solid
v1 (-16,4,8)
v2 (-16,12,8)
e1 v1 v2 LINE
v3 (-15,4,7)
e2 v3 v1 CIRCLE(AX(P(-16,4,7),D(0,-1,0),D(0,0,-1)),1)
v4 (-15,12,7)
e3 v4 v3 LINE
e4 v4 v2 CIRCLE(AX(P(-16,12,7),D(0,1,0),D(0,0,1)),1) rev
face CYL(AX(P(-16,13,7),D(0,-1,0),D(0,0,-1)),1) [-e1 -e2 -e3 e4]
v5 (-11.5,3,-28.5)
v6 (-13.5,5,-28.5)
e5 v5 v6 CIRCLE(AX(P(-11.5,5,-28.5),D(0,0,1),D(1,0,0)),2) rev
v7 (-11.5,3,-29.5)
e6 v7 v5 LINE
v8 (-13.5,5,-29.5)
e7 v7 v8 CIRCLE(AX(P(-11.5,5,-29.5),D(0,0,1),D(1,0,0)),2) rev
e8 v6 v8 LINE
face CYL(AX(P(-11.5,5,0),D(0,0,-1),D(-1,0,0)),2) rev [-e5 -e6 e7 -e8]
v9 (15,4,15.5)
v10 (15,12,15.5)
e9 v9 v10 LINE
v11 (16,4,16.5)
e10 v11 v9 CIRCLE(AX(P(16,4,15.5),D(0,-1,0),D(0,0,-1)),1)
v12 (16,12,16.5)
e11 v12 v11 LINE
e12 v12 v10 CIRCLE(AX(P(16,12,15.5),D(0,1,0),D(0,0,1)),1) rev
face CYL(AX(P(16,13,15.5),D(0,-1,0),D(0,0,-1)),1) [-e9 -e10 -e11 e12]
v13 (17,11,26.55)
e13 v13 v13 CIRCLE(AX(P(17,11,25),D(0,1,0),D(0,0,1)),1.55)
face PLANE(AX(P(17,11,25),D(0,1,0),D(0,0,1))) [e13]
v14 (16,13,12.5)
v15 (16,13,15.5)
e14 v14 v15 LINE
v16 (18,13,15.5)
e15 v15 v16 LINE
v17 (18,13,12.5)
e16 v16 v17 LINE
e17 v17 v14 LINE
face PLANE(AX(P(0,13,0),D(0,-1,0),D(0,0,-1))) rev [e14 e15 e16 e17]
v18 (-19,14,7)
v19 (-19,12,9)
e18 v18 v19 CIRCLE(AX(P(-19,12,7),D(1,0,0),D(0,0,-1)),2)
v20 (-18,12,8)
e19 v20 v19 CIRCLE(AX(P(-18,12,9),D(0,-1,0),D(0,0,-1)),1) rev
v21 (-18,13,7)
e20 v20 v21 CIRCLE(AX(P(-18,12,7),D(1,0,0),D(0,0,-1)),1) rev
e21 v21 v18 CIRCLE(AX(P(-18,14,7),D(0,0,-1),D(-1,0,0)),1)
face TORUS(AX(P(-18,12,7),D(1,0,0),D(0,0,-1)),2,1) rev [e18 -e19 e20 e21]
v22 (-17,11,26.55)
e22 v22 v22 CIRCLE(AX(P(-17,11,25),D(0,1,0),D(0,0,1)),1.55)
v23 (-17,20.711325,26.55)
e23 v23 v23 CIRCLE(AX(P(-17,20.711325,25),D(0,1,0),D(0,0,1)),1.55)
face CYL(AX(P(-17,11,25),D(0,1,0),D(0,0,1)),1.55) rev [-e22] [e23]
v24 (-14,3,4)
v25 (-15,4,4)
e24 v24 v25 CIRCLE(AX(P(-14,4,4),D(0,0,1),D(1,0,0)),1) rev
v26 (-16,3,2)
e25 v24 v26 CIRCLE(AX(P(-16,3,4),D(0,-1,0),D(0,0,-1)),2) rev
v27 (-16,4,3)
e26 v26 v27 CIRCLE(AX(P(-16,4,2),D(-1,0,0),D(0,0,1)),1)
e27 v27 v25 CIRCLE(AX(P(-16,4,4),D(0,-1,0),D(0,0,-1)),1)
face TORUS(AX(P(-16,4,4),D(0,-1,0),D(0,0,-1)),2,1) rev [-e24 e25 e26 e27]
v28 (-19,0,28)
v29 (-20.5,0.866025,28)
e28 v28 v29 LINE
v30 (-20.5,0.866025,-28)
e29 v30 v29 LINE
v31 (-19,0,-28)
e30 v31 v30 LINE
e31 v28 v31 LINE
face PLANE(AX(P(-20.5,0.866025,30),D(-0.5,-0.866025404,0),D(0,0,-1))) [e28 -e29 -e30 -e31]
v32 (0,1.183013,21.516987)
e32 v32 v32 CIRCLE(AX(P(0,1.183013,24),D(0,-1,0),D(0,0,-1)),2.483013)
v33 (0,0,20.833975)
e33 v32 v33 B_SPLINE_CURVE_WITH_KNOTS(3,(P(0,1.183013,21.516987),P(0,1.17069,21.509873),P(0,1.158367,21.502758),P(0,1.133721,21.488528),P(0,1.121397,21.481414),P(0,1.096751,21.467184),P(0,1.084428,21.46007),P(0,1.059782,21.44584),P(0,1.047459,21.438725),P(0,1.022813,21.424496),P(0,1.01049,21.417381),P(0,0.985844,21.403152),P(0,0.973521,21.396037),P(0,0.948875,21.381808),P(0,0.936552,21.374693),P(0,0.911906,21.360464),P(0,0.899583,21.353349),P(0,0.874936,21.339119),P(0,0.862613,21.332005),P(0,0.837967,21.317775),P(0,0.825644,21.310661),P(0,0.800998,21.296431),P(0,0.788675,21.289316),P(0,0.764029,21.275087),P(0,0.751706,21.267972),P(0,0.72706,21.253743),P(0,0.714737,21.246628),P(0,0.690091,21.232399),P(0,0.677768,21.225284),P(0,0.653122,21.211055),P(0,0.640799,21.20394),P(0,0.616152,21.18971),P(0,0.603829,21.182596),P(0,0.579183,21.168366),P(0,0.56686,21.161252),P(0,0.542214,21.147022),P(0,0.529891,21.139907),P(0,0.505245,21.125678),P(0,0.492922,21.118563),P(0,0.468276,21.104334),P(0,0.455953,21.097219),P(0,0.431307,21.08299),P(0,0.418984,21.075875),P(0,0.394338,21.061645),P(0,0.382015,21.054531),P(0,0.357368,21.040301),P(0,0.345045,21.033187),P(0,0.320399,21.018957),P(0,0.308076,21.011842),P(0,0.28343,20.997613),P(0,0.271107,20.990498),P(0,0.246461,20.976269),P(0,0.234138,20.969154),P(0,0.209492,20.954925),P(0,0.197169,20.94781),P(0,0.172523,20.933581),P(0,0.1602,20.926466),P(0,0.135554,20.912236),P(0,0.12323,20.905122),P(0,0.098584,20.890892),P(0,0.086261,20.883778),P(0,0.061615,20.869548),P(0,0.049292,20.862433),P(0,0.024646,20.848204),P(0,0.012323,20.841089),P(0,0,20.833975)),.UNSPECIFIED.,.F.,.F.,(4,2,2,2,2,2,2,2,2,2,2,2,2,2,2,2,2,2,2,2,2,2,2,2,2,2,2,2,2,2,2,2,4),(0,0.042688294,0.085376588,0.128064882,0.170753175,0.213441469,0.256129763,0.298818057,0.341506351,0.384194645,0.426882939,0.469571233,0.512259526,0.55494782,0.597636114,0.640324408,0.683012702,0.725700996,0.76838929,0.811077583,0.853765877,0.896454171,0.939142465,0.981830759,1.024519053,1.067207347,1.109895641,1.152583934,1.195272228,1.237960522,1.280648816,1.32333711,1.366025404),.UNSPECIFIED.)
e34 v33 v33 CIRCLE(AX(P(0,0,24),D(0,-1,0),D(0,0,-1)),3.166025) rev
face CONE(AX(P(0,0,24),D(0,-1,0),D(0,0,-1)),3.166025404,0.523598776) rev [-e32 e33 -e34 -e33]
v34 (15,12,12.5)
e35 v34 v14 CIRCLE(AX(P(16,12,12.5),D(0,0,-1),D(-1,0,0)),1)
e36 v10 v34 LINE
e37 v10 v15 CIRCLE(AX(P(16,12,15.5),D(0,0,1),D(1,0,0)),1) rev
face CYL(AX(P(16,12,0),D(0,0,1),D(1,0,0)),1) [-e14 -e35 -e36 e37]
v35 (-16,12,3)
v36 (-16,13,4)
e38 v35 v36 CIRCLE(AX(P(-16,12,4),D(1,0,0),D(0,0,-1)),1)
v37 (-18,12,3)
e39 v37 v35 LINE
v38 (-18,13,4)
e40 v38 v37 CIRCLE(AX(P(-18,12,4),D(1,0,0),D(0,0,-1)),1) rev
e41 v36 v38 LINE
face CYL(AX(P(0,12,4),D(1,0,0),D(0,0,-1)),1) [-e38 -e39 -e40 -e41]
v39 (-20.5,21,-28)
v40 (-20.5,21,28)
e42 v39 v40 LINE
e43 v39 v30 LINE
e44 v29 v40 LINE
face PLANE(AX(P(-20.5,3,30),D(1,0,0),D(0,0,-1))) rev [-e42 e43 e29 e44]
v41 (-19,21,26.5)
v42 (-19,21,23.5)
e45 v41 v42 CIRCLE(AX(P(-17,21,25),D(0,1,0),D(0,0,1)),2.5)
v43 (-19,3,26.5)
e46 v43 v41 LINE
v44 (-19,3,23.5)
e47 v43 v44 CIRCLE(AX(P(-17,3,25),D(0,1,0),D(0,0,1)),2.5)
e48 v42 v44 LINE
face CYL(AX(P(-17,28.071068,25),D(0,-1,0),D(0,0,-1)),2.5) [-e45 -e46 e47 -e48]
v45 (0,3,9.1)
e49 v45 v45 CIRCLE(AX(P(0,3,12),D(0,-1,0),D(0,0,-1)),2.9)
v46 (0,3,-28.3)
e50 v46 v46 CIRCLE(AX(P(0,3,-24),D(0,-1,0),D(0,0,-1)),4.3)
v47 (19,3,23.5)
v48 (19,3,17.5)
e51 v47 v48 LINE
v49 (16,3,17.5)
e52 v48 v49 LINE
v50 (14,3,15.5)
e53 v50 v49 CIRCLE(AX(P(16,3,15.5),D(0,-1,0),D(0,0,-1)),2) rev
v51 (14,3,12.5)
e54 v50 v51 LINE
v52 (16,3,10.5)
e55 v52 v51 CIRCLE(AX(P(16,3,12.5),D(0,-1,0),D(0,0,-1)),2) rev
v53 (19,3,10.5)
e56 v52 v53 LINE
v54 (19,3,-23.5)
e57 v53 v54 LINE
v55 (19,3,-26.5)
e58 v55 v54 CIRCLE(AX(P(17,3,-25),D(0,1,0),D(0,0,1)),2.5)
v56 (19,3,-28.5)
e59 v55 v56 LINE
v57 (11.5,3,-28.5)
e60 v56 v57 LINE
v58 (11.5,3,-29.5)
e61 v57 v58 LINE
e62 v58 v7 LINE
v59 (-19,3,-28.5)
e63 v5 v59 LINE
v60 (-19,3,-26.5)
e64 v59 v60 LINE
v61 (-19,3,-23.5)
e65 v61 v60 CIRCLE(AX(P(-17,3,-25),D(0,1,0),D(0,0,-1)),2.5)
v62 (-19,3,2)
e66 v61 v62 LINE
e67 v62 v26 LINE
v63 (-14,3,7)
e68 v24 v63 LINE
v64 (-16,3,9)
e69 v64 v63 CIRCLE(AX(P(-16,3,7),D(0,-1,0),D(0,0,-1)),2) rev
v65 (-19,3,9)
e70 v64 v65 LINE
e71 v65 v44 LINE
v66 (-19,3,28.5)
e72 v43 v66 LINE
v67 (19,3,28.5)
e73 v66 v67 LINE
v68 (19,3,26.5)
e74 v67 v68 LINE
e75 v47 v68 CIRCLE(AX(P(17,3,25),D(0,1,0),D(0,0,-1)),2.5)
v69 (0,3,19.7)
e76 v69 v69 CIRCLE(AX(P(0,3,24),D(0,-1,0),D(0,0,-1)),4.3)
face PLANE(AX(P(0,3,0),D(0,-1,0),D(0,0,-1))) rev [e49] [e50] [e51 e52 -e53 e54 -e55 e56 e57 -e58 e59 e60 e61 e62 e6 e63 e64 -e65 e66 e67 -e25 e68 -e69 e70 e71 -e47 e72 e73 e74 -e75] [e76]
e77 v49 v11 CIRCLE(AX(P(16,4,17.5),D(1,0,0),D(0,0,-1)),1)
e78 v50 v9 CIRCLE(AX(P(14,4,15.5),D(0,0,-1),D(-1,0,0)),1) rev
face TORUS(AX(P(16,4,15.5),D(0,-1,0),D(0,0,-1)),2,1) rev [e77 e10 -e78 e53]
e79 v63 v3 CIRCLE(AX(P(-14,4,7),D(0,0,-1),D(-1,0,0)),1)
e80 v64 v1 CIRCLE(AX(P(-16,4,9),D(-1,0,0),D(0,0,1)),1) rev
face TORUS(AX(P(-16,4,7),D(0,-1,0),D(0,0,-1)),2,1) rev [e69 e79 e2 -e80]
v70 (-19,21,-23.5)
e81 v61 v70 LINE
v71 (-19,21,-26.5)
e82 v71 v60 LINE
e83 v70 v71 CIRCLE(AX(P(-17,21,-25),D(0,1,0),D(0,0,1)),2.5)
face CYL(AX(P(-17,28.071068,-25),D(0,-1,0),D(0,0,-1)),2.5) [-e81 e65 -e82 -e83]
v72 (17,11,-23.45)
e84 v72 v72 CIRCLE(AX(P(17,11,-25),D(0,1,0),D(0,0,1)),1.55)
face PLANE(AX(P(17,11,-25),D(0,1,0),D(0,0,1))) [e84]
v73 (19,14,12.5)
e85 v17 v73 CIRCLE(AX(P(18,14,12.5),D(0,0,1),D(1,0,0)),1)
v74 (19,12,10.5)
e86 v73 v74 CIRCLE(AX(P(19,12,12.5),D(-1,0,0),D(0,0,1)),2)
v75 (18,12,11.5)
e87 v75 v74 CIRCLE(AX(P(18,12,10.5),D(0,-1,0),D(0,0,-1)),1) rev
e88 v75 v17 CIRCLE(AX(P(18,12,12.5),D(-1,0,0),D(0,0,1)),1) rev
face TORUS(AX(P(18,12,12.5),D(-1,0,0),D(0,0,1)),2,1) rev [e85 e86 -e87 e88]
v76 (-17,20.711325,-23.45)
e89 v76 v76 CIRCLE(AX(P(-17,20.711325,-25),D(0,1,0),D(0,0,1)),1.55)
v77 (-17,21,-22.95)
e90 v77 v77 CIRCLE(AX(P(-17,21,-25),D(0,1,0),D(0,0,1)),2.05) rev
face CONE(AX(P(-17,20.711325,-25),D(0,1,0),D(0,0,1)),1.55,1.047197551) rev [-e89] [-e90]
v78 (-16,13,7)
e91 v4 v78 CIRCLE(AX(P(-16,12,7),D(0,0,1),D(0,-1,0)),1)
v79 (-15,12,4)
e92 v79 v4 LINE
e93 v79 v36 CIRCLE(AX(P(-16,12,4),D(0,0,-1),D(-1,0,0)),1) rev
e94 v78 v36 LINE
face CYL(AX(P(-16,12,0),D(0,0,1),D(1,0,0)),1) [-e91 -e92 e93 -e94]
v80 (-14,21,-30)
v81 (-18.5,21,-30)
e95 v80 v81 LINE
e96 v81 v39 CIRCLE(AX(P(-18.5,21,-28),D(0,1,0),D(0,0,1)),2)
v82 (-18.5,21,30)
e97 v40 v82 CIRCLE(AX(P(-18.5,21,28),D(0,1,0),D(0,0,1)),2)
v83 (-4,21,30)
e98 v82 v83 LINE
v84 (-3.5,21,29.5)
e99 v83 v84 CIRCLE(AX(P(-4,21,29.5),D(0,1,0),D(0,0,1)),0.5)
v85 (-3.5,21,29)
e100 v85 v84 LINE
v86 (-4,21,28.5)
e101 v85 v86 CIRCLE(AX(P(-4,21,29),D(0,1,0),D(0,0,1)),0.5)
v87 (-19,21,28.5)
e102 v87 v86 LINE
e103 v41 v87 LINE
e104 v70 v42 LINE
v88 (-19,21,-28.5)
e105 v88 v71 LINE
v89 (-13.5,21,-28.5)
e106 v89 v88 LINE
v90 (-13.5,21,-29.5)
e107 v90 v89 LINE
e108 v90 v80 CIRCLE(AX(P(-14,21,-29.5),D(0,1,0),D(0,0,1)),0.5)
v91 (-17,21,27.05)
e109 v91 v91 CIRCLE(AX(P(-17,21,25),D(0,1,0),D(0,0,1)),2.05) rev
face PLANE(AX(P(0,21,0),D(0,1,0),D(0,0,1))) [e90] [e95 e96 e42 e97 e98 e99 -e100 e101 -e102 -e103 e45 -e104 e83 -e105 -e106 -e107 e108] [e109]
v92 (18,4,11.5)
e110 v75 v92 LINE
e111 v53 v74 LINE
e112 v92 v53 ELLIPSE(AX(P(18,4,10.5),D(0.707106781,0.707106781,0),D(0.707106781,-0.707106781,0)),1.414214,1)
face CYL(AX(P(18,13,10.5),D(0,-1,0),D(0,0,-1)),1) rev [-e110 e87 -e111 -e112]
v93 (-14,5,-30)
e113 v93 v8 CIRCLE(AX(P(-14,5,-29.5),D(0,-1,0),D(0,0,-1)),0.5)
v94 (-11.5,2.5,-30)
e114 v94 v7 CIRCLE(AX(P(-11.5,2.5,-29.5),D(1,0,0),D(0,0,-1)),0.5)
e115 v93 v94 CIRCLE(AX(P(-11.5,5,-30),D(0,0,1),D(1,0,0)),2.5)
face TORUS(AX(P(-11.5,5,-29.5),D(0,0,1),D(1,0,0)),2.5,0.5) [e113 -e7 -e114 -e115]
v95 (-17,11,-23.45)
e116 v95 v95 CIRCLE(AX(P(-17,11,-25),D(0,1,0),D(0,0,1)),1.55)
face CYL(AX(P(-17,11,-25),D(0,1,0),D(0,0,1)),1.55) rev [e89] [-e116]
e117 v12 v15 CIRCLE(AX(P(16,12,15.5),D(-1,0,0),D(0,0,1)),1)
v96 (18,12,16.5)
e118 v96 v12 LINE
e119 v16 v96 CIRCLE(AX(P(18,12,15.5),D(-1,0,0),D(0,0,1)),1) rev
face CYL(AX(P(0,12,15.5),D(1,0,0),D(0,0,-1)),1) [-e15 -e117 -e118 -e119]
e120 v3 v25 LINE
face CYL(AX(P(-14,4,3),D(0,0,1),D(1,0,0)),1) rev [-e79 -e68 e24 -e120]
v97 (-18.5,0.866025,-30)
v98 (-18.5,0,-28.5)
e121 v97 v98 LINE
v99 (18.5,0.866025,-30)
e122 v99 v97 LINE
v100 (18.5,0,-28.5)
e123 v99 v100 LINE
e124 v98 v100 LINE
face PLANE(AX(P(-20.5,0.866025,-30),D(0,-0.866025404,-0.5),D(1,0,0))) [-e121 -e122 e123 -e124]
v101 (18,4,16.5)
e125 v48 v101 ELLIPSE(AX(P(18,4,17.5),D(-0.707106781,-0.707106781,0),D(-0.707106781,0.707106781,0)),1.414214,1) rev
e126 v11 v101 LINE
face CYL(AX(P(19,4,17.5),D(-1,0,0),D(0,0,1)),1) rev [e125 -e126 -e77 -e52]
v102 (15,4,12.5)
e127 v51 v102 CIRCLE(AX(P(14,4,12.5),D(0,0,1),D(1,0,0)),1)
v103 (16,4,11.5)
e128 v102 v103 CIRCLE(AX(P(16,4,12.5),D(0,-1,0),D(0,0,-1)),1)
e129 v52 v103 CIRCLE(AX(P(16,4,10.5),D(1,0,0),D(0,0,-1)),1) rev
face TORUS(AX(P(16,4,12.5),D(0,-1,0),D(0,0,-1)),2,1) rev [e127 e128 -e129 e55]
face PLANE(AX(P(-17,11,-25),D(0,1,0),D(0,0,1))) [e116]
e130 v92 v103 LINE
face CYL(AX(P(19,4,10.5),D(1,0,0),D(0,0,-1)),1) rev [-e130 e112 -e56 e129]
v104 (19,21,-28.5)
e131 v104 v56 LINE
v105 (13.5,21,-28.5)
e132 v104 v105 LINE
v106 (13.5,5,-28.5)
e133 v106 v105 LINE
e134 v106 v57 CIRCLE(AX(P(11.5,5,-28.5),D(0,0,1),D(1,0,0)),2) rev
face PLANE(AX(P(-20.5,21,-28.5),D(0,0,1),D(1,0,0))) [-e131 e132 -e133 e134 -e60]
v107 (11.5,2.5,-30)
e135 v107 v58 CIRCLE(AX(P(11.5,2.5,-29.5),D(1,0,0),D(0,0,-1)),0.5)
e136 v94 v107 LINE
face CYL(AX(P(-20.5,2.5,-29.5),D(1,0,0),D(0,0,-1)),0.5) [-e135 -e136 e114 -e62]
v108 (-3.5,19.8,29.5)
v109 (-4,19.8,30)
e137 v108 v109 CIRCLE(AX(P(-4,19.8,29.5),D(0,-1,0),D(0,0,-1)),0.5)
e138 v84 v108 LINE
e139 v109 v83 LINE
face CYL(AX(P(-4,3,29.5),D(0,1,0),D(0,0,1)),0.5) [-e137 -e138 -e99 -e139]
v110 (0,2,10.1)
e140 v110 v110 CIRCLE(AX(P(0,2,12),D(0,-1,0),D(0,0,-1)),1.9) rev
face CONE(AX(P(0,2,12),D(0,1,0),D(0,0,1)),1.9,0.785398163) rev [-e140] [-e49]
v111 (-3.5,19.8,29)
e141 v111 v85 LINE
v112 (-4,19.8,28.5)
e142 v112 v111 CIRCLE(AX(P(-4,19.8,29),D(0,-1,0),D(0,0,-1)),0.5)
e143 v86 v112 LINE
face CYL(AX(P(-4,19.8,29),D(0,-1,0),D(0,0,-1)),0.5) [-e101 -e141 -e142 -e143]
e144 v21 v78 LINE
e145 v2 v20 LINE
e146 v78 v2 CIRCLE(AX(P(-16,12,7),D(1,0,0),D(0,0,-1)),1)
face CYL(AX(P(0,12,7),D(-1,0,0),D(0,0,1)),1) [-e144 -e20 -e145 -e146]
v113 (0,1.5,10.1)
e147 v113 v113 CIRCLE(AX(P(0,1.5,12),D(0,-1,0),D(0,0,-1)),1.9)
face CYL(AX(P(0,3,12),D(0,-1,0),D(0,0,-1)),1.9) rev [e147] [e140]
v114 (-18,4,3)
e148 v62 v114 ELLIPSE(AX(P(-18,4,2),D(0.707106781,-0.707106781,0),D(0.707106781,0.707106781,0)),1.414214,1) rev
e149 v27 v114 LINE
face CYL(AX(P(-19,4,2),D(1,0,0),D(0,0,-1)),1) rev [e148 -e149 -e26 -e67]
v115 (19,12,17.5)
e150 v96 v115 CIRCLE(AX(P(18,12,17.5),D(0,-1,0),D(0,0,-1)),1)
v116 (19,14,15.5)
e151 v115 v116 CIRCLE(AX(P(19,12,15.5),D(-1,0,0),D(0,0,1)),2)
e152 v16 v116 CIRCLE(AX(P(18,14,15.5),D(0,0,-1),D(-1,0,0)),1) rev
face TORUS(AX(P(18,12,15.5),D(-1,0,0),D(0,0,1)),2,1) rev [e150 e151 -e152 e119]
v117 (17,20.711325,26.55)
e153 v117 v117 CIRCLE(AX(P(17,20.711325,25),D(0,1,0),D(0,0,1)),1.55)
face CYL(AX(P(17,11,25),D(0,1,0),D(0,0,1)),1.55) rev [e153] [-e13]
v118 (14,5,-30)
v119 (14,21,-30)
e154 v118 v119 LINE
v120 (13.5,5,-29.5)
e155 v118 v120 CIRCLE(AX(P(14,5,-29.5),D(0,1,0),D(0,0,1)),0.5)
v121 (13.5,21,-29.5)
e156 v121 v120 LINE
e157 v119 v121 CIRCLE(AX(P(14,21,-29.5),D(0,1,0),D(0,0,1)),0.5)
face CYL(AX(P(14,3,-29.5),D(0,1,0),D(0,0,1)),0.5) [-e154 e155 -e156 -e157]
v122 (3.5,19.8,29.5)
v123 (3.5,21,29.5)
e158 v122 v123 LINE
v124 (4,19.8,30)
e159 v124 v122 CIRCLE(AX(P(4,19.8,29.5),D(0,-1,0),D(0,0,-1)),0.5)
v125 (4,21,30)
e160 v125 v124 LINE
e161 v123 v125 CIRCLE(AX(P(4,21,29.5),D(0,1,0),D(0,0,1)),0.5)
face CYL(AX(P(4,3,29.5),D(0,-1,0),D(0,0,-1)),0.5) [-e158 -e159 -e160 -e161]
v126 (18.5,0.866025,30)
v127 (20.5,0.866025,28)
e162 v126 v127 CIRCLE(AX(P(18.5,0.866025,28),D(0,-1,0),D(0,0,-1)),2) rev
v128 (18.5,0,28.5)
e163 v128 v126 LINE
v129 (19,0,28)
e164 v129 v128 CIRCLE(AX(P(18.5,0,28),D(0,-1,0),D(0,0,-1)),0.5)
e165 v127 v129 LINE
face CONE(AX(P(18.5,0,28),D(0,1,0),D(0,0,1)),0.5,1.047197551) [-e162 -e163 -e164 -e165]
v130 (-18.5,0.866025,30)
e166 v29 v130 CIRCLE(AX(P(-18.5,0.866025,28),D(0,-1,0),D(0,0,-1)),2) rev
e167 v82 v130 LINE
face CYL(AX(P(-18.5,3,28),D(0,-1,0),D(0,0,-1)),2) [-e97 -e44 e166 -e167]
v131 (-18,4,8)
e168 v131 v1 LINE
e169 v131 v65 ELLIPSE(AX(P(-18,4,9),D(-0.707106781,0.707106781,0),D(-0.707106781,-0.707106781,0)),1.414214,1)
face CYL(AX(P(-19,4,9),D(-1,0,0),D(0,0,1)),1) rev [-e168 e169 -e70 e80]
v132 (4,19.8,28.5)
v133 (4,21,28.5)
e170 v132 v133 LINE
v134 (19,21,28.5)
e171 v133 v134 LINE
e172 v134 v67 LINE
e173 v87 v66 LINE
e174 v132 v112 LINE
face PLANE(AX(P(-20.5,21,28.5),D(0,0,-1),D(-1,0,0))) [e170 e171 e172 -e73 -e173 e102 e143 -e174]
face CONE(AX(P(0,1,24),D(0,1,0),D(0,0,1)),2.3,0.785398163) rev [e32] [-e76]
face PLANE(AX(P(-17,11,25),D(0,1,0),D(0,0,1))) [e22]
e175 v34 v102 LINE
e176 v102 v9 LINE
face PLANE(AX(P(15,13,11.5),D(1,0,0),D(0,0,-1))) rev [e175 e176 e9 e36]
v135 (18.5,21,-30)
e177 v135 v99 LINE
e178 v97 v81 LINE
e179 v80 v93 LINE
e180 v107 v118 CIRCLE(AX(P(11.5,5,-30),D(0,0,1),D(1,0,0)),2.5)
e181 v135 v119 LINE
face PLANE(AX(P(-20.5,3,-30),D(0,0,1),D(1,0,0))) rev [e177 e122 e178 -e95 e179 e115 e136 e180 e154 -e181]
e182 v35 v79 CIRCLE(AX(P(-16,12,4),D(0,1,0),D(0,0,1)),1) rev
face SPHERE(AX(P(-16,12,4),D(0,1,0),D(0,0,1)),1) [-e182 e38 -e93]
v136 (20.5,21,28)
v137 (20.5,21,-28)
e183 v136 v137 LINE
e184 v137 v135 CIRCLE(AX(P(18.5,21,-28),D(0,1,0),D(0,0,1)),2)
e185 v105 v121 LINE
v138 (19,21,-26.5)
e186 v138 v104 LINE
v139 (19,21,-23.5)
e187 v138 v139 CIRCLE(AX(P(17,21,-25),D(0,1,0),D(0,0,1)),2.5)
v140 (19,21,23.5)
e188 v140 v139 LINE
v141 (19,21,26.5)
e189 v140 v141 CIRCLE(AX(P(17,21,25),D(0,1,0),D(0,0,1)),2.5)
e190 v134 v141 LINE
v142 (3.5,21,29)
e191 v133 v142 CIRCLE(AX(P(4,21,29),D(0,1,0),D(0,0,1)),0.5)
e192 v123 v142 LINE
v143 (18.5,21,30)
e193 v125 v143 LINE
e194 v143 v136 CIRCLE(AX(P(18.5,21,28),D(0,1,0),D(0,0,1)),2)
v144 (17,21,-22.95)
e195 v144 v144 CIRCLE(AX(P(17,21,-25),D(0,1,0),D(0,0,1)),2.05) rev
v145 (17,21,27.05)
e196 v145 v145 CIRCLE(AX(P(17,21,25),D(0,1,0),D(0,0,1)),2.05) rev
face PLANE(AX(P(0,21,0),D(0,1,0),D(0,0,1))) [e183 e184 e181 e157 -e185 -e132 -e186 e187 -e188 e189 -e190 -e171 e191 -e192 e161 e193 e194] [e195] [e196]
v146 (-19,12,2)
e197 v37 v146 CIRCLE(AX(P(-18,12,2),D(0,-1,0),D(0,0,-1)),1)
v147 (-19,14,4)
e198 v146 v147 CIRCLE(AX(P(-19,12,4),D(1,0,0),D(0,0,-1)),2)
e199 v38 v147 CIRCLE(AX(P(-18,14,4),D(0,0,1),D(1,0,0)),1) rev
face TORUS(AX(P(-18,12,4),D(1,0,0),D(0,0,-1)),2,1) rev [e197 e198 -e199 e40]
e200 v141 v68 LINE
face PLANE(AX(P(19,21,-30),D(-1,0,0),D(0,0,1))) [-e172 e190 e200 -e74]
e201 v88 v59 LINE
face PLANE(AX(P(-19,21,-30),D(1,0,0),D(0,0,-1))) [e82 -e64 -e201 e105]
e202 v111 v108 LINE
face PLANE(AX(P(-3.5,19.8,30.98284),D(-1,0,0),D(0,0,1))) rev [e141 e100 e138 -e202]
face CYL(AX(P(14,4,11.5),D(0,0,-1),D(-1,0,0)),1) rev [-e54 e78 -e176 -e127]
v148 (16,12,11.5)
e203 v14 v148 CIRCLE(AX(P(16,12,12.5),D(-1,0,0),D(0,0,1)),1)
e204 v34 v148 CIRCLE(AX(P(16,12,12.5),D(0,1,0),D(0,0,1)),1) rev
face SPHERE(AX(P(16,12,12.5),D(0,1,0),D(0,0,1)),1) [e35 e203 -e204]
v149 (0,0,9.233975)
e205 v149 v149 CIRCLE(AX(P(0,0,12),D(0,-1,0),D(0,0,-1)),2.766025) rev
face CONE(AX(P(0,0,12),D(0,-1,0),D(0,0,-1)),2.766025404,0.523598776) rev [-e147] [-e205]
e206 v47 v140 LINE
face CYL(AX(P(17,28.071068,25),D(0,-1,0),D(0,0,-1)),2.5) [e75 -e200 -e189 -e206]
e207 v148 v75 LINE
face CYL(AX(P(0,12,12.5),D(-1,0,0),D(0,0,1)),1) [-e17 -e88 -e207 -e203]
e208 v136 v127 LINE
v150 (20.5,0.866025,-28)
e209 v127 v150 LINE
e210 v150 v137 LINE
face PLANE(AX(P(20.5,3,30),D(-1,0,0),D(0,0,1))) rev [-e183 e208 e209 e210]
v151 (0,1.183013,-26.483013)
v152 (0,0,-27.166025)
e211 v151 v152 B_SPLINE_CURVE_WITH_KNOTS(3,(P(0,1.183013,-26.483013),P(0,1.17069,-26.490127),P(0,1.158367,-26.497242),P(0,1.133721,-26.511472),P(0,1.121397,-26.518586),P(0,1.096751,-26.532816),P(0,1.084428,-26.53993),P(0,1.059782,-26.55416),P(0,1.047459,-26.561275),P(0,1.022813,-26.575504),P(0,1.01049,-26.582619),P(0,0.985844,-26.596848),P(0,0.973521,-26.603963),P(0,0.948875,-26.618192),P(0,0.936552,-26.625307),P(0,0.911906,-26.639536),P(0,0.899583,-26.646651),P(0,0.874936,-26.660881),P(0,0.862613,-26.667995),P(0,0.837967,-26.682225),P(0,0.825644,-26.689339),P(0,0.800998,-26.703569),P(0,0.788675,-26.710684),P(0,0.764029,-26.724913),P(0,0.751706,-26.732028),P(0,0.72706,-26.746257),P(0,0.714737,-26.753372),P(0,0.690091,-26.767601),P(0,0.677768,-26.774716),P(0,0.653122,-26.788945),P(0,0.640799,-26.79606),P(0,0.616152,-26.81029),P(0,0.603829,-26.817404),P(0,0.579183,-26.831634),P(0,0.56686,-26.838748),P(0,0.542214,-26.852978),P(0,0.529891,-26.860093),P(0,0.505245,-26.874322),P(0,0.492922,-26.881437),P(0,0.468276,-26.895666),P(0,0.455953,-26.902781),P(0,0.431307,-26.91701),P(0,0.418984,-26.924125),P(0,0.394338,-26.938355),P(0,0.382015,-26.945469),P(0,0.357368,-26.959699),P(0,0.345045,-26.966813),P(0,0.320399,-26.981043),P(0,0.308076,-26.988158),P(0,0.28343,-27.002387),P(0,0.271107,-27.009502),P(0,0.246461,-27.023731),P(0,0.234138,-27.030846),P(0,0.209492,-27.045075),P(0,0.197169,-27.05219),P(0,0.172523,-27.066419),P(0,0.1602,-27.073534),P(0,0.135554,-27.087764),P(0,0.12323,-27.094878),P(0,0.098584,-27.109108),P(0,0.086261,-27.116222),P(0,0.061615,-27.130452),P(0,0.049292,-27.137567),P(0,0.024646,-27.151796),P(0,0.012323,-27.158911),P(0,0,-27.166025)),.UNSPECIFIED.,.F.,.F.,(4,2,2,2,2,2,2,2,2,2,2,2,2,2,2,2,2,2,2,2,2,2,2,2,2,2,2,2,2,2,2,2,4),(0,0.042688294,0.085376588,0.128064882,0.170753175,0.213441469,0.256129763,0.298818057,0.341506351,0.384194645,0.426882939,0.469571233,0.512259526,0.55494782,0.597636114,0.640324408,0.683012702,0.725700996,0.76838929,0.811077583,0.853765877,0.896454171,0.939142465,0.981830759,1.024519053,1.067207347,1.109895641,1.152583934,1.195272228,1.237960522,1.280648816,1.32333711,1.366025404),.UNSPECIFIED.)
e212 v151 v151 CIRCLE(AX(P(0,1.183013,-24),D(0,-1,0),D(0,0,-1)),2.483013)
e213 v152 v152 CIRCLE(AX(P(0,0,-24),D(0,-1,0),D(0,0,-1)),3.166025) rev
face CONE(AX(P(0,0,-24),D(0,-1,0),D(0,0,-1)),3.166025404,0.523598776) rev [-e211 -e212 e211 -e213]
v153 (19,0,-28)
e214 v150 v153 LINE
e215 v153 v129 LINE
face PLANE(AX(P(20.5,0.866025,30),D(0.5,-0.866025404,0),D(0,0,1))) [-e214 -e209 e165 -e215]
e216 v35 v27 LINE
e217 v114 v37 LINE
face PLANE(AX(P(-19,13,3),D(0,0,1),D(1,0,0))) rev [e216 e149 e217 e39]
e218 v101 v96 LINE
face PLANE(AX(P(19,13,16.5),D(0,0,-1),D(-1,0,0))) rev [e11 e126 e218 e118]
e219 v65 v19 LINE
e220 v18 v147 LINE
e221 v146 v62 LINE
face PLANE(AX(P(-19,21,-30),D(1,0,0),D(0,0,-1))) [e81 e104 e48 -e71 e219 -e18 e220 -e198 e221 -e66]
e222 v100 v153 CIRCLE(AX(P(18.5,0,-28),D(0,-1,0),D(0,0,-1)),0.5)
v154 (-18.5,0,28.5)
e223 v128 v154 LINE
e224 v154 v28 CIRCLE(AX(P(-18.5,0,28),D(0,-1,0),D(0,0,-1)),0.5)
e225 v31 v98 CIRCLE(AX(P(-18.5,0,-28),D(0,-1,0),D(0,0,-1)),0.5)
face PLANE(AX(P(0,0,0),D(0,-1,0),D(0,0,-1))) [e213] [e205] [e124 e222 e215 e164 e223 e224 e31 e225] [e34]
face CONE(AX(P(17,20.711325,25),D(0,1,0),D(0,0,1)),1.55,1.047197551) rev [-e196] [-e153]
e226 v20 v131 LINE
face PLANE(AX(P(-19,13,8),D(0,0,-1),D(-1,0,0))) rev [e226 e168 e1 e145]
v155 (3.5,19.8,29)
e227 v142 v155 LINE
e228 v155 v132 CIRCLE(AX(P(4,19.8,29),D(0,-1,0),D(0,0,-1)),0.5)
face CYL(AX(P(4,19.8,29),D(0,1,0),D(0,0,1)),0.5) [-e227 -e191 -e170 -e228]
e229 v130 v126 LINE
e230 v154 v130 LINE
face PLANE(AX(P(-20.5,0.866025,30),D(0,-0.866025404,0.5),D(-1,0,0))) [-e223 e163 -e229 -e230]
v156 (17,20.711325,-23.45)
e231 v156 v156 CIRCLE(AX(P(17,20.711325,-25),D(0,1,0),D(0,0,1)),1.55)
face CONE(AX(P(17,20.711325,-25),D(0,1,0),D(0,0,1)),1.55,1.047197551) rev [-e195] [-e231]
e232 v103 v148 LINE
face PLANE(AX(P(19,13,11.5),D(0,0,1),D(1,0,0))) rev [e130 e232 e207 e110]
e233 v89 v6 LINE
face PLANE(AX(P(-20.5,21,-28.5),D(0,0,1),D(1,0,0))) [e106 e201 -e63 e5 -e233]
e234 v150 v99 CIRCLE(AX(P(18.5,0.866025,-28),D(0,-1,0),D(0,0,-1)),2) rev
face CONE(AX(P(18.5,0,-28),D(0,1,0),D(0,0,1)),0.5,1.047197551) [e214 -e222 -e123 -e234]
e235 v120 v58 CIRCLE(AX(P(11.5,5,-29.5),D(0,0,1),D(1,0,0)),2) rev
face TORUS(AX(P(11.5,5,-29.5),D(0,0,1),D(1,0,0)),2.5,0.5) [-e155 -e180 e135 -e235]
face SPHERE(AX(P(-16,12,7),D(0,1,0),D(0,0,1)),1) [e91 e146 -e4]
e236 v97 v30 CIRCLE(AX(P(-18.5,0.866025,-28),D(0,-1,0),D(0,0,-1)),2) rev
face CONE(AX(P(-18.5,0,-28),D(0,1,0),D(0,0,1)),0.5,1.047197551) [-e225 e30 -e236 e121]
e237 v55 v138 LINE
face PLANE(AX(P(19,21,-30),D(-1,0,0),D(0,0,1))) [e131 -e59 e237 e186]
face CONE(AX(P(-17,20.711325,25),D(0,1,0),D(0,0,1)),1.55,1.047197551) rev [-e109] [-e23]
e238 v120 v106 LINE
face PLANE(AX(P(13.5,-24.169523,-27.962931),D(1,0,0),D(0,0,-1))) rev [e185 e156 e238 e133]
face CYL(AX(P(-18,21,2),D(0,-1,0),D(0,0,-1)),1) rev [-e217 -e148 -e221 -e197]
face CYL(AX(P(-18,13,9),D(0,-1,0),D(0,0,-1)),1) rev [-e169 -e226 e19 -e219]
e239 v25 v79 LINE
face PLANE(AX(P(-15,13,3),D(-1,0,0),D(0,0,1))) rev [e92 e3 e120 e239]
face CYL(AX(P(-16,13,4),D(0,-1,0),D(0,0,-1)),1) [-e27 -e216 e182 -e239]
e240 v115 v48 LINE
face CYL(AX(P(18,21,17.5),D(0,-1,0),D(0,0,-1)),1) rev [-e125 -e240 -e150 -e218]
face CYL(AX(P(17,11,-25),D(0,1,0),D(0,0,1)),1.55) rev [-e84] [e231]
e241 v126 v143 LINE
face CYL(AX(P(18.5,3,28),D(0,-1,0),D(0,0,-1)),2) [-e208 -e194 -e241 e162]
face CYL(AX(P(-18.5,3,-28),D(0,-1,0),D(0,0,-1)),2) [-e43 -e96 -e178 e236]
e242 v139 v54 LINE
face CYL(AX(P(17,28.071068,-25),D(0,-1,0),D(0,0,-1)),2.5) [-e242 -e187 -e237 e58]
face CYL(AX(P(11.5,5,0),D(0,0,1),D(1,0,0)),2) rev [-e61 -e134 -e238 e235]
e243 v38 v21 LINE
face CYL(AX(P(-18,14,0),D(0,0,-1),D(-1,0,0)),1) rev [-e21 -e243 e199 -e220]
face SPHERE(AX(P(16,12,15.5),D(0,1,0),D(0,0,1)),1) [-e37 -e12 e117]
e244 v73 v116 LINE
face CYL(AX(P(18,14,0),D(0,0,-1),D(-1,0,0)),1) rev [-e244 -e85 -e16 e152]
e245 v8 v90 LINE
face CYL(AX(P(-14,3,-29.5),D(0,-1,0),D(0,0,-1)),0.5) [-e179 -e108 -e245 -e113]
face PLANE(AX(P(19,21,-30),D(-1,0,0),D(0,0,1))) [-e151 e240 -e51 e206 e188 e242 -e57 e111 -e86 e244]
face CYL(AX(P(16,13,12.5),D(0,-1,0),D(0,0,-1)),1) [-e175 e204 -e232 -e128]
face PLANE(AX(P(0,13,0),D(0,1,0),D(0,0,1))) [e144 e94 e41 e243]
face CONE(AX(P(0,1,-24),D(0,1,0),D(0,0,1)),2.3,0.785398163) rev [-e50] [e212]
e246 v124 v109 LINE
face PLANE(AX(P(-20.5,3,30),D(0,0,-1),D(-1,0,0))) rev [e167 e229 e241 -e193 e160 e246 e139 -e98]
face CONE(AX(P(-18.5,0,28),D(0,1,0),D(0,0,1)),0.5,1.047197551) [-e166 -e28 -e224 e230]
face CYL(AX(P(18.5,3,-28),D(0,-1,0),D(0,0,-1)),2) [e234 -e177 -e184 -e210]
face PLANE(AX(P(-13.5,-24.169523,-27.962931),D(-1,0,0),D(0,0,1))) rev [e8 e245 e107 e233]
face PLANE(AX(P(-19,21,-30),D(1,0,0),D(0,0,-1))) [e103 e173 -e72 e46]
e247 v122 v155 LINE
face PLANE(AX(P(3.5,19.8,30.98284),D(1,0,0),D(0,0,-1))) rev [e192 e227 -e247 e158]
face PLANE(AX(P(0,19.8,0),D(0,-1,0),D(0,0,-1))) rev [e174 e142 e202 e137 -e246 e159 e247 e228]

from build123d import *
from OCP.BRepFilletAPI import BRepFilletAPI_MakeChamfer

# Parameters (mm, degrees)
SKETCH_1_W          = 41
SKETCH_1_H          = 60
SKETCH_1_R          = 2.3
SKETCH_1_R_2        = 1.9
EXTRUDE_1_DEPTH     = 3
CHAMFER_1_SIZE      = 2
SKETCH_2_W          = 41
SKETCH_2_H          = 60
SKETCH_2_W_2        = 38
SKETCH_2_H_2        = 57
EXTRUDE_1_2_DEPTH   = 18
SKETCH_3_W          = 27
SKETCH_3_H          = 3.030341357
CUT_EXTRUDE_1_DEPTH = 18
SKETCH_4_R          = 2.5
EXTRUDE_2_DEPTH     = 18
SKETCH_5_R          = 1.55
CUT_EXTRUDE_2_DEPTH = 10
SKETCH_7_W          = 7
SKETCH_7_H          = 4.356080651
CUT_EXTRUDE_3_DEPTH = 1.2
FILLET_2_R          = 0.5
FILLET_3_R          = 2
CHAMFER_4_SIZE      = 0.866025404
CHAMFER_4_SIZE_2    = 1.5
CHAMFER_6_SIZE      = 0.5
CHAMFER_6_SIZE2     = 0.288675135
SKETCH_8_W          = 4
SKETCH_8_H          = 5
EXTRUDE_3_DEPTH     = 10
FILLET_6_R          = 1
FILLET_7_R          = 2
FILLET_8_R          = 0.5
CHAMFER_7_SIZE      = 1


with BuildPart() as part:
    # Эскиз1 → Extrude 1 (new body)
    with BuildSketch(Plane(origin=(0, 0, 0), x_dir=(1, 0, 0), z_dir=(0, 1, 0))):
        Rectangle(SKETCH_1_W, SKETCH_1_H)
        with Locations(Location((0, 24, 0), (0, 0, 270))):
            Circle(SKETCH_1_R, mode=Mode.SUBTRACT)
        with Locations(Location((0, -24, 0), (0, 0, 270))):
            Circle(SKETCH_1_R, mode=Mode.SUBTRACT)
        with Locations(Location((0, -12, 0), (0, 0, 270))):
            Circle(SKETCH_1_R_2, mode=Mode.SUBTRACT)
    extrude(amount=EXTRUDE_1_DEPTH)

    # Фаска1
    chamfer_1_edges = [part.edges().sort_by_distance(p)[0] for p in [
        (0, 3, -26.3),
        (0, 3, 21.7),
    ]]
    chamfer(chamfer_1_edges, length=CHAMFER_1_SIZE)

    # Эскиз2 → Extrude 1 2 (add)
    with BuildSketch(Plane(origin=(0, 3, 0), x_dir=(1, 0, 0), z_dir=(0, 1, 0))):
        Rectangle(SKETCH_2_W, SKETCH_2_H)
        Rectangle(SKETCH_2_W_2, SKETCH_2_H_2, mode=Mode.SUBTRACT)
    extrude(amount=EXTRUDE_1_2_DEPTH)

    # Эскиз3 → Вырез-Вытянуть1 (cut)
    with BuildSketch(Plane(origin=(0, 21, 0), x_dir=(1, 0, 0), z_dir=(0, 1, 0))):
        with Locations((0, 29.478101209)):
            Rectangle(SKETCH_3_W, SKETCH_3_H)
    extrude(amount=-CUT_EXTRUDE_1_DEPTH, mode=Mode.SUBTRACT)

    # Эскиз4 → Бобышка-Вытянуть2 (add)
    with BuildSketch(Plane(origin=(0, 3, 0), x_dir=(1, 0, 0), z_dir=(0, 1, 0))):
        with Locations((17, 25)):
            Circle(SKETCH_4_R)
        with Locations((-17, 25)):
            Circle(SKETCH_4_R)
        with Locations((17, -25)):
            Circle(SKETCH_4_R)
        with Locations((-17, -25)):
            Circle(SKETCH_4_R)
    extrude(amount=EXTRUDE_2_DEPTH)

    # Эскиз5 → Вырез-Вытянуть2 (cut)
    with BuildSketch(Plane(origin=(0, 21, 0), x_dir=(1, 0, 0), z_dir=(0, 1, 0))):
        with Locations(Location((17, 25, 0), (0, 0, 270))):
            Circle(SKETCH_5_R)
        with Locations(Location((17, -25, 0), (0, 0, 270))):
            Circle(SKETCH_5_R)
        with Locations(Location((-17, -25, 0), (0, 0, 270))):
            Circle(SKETCH_5_R)
        with Locations(Location((-17, 25, 0), (0, 0, 270))):
            Circle(SKETCH_5_R)
    extrude(amount=-CUT_EXTRUDE_2_DEPTH, mode=Mode.SUBTRACT)

    # Эскиз7 → Вырез-Вытянуть3 (cut)
    with BuildSketch(Plane(origin=(0, 21, 0), x_dir=(1, 0, 0), z_dir=(0, 1, 0))):
        with Locations((0, -28.804800006)):
            Rectangle(SKETCH_7_W, SKETCH_7_H)
    extrude(amount=-CUT_EXTRUDE_3_DEPTH, mode=Mode.SUBTRACT)

    # Скругление2
    fillet_2_edges = [part.edges().sort_by_distance(p)[0] for p in [
        (-3.5, 20.4, 28.5),
        (3.5, 20.4, 28.5),
        (3.5, 20.4, 30),
        (-3.5, 20.4, 30),
    ]]
    fillet(fillet_2_edges, radius=FILLET_2_R)

    # Скругление3
    fillet_3_edges = [part.edges().sort_by_distance(p)[0] for p in [
        (20.5, 10.5, 30),
        (-20.5, 10.5, 30),
        (-20.5, 10.5, -30),
        (20.5, 10.5, -30),
    ]]
    fillet(fillet_3_edges, radius=FILLET_3_R)

    # Фаска4
    # the kernel refuses this chamfer: 1.5, 0.866025404 mm, written as the material it takes off along each edge
    with BuildSketch(Plane(origin=(0, 0, 24), x_dir=(0, 0, 1), z_dir=(-1, 0, 0))) as chamfer_4_piece_1:
        Polygon((2.3 + CHAMFER_4_SIZE, 0), (2.3, CHAMFER_4_SIZE_2), (2.3, 0), align=None)
    revolve(axis=Axis((0, 0, 24), (0, 1, 0)), mode=Mode.SUBTRACT)
    with BuildSketch(Plane(origin=(18.5, 0, -30), x_dir=(0, -0.01932676561270073, 0.999813220622208), z_dir=(-1, 0, 0))) as chamfer_4_piece_2:
        Polygon((CHAMFER_4_SIZE_2 * 0.999813220622, CHAMFER_4_SIZE_2 * 0.0193267656127), (-CHAMFER_4_SIZE * 0.0193267656079, CHAMFER_4_SIZE * 0.999813220373), (0, 0), align=None)
    extrude(amount=37, mode=Mode.SUBTRACT)
    with BuildSketch(Plane(origin=(-20.5, 0, -28), x_dir=(0.999813220622208, -0.01932676561270073, 0), z_dir=(0, 0, 1)), Plane(origin=(20.5, 0, 28), x_dir=(-0.999813220622208, -0.01932676561270073, 0), z_dir=(0, 0, -1))) as chamfer_4_piece_3:
        Polygon((CHAMFER_4_SIZE_2 * 0.999813220622, CHAMFER_4_SIZE_2 * 0.0193267656127), (-CHAMFER_4_SIZE * 0.0193267656079, CHAMFER_4_SIZE * 0.999813220373), (0, 0), align=None)
    extrude(amount=56, mode=Mode.SUBTRACT)
    with BuildSketch(Plane(origin=(-18.5, 0, 30), x_dir=(0, 0.9983227437537924, 0.0578938624026721), z_dir=(1, 0, 0))) as chamfer_4_piece_4:
        Polygon((CHAMFER_4_SIZE * 0.998322743505, -CHAMFER_4_SIZE * 0.0578938623883), (-CHAMFER_4_SIZE_2 * 0.0578938624027, -CHAMFER_4_SIZE_2 * 0.998322743754), (0, 0), align=None)
    extrude(amount=37, mode=Mode.SUBTRACT)
    with BuildSketch(Plane(origin=(-18.5, 0, -28), x_dir=(0, 0, -1), z_dir=(1, 0, 0))) as chamfer_4_piece_5:
        Polygon((2 - CHAMFER_4_SIZE_2, 0), (2, CHAMFER_4_SIZE), (2, 0), align=None)
    revolve(axis=Axis((-18.5, 0, -28), (0, 1, 0)), revolution_arc=90, mode=Mode.SUBTRACT)
    with BuildSketch(Plane(origin=(-18.5, 0, 28), x_dir=(0, 0, 1), z_dir=(1, 0, 0))) as chamfer_4_piece_6:
        Polygon((2 - CHAMFER_4_SIZE_2, 0), (2, -CHAMFER_4_SIZE), (2, 0), align=None)
    revolve(axis=Axis((-18.5, 0, 28), (0, -1, 0)), revolution_arc=90, mode=Mode.SUBTRACT)
    with BuildSketch(Plane(origin=(18.5, 0, 28), x_dir=(0, 0, 1), z_dir=(-1, 0, 0))) as chamfer_4_piece_7:
        Polygon((2, CHAMFER_4_SIZE), (2 - CHAMFER_4_SIZE_2, 0), (2, 0), align=None)
    revolve(axis=Axis((18.5, 0, 28), (0, 1, 0)), revolution_arc=90, mode=Mode.SUBTRACT)
    with BuildSketch(Plane(origin=(18.5, 0, -28), x_dir=(0, 0, -1), z_dir=(-1, 0, 0))) as chamfer_4_piece_8:
        Polygon((2 - CHAMFER_4_SIZE_2, 0), (2, -CHAMFER_4_SIZE), (2, 0), align=None)
    revolve(axis=Axis((18.5, 0, -28), (0, -1, 0)), revolution_arc=90, mode=Mode.SUBTRACT)
    with BuildSketch(Plane(origin=(0, 0, -24), x_dir=(0, 0, 1), z_dir=(-1, 0, 0))) as chamfer_4_piece_9:
        Polygon((2.3 + CHAMFER_4_SIZE, 0), (2.3, CHAMFER_4_SIZE_2), (2.3, 0), align=None)
    revolve(axis=Axis((0, 0, -24), (0, 1, 0)), mode=Mode.SUBTRACT)
    with BuildSketch(Plane(origin=(0, 0, 12), x_dir=(0, 0, 1), z_dir=(-1, 0, 0))) as chamfer_4_piece_10:
        Polygon((1.9 + CHAMFER_4_SIZE, 0), (1.9, CHAMFER_4_SIZE_2), (1.9, 0), align=None)
    revolve(axis=Axis((0, 0, 12), (0, 1, 0)), mode=Mode.SUBTRACT)

    # Фаска6: one chamfer whose edges measure the first distance from different faces: ONE call of the kernel's chamfer builder (chamfer() names one face for all edges)
    chamfer_6_edges_1 = [part.edges().sort_by_distance(p)[0] for p in [
        (-17, 21, -26.55),
        (-17, 21, 23.45),
    ]]
    chamfer_6_side_1 = [part.faces().sort_by_distance(p)[0] for p in [
        (-11.25, 21, 29.376381527),
    ]]
    chamfer_6_edges_2 = [part.edges().sort_by_distance(p)[0] for p in [
        (17, 21, 23.45),
        (17, 21, -26.55),
    ]]
    chamfer_6_side_2 = [part.faces().sort_by_distance(p)[0] for p in [
        (11.25, 21, 29.376381527),
    ]]
    chamfer_6 = BRepFilletAPI_MakeChamfer(part.part.solid().wrapped)
    for e in chamfer_6_edges_1:
        chamfer_6.Add(CHAMFER_6_SIZE, CHAMFER_6_SIZE2, e.wrapped, chamfer_6_side_1[0].wrapped)  # the first distance lies on this face
    for e in chamfer_6_edges_2:
        chamfer_6.Add(CHAMFER_6_SIZE, CHAMFER_6_SIZE2, e.wrapped, chamfer_6_side_2[0].wrapped)  # the first distance lies on this face
    add(Compound.cast(chamfer_6.Shape()), mode=Mode.REPLACE)

    # Эскиз8 → Бобышка-Вытянуть3 (add)
    with BuildSketch(Plane(origin=(0, 3, 0), x_dir=(1, 0, 0), z_dir=(0, 1, 0))):
        with Locations((17, -14)):
            Rectangle(SKETCH_8_W, SKETCH_8_H)
        with Locations((-17, -5.5)):
            Rectangle(SKETCH_8_W, SKETCH_8_H)
    extrude(amount=EXTRUDE_3_DEPTH)

    # Скругление6
    fillet_6_edges = [part.edges().sort_by_distance(p)[0] for p in [
        (19, 8, 16.5),
        (17, 3, 11.5),
        (19, 8, 11.5),
        (15, 3, 14),
        (15, 8, 11.5),
        (17, 3, 16.5),
        (15, 8, 16.5),
        (19, 13, 14),
        (17, 13, 11.5),
        (15, 13, 14),
        (17, 13, 16.5),
        (-19, 8, 3),
        (-17, 3, 8),
        (-19, 8, 8),
        (-15, 3, 5.5),
        (-15, 8, 8),
        (-17, 3, 3),
        (-15, 8, 3),
        (-19, 13, 5.5),
        (-17, 13, 8),
        (-15, 13, 5.5),
        (-17, 13, 3),
    ]]
    fillet(fillet_6_edges, radius=FILLET_6_R)

    # Скругление7
    fillet_7_edges = [part.edges().sort_by_distance(p)[0] for p in [
        (-13.5, 3, -29.25),
        (13.5, 3, -29.25),
    ]]
    fillet(fillet_7_edges, radius=FILLET_7_R)

    # Скругление8
    fillet_8_edges = [part.edges().sort_by_distance(p)[0] for p in [
        (0, 3, -30),
        (13.5, 13, -30),
        (12.914213562, 3.585786438, -30),
        (-12.914213562, 3.585786438, -30),
        (-13.5, 13, -30),
    ]]
    fillet(fillet_8_edges, radius=FILLET_8_R)

    # Фаска7
    chamfer_7_edges = [part.edges().sort_by_distance(p)[0] for p in [
        (0, 3, 10.1),
    ]]
    chamfer(chamfer_7_edges, length=CHAMFER_7_SIZE)


solid = part.part
